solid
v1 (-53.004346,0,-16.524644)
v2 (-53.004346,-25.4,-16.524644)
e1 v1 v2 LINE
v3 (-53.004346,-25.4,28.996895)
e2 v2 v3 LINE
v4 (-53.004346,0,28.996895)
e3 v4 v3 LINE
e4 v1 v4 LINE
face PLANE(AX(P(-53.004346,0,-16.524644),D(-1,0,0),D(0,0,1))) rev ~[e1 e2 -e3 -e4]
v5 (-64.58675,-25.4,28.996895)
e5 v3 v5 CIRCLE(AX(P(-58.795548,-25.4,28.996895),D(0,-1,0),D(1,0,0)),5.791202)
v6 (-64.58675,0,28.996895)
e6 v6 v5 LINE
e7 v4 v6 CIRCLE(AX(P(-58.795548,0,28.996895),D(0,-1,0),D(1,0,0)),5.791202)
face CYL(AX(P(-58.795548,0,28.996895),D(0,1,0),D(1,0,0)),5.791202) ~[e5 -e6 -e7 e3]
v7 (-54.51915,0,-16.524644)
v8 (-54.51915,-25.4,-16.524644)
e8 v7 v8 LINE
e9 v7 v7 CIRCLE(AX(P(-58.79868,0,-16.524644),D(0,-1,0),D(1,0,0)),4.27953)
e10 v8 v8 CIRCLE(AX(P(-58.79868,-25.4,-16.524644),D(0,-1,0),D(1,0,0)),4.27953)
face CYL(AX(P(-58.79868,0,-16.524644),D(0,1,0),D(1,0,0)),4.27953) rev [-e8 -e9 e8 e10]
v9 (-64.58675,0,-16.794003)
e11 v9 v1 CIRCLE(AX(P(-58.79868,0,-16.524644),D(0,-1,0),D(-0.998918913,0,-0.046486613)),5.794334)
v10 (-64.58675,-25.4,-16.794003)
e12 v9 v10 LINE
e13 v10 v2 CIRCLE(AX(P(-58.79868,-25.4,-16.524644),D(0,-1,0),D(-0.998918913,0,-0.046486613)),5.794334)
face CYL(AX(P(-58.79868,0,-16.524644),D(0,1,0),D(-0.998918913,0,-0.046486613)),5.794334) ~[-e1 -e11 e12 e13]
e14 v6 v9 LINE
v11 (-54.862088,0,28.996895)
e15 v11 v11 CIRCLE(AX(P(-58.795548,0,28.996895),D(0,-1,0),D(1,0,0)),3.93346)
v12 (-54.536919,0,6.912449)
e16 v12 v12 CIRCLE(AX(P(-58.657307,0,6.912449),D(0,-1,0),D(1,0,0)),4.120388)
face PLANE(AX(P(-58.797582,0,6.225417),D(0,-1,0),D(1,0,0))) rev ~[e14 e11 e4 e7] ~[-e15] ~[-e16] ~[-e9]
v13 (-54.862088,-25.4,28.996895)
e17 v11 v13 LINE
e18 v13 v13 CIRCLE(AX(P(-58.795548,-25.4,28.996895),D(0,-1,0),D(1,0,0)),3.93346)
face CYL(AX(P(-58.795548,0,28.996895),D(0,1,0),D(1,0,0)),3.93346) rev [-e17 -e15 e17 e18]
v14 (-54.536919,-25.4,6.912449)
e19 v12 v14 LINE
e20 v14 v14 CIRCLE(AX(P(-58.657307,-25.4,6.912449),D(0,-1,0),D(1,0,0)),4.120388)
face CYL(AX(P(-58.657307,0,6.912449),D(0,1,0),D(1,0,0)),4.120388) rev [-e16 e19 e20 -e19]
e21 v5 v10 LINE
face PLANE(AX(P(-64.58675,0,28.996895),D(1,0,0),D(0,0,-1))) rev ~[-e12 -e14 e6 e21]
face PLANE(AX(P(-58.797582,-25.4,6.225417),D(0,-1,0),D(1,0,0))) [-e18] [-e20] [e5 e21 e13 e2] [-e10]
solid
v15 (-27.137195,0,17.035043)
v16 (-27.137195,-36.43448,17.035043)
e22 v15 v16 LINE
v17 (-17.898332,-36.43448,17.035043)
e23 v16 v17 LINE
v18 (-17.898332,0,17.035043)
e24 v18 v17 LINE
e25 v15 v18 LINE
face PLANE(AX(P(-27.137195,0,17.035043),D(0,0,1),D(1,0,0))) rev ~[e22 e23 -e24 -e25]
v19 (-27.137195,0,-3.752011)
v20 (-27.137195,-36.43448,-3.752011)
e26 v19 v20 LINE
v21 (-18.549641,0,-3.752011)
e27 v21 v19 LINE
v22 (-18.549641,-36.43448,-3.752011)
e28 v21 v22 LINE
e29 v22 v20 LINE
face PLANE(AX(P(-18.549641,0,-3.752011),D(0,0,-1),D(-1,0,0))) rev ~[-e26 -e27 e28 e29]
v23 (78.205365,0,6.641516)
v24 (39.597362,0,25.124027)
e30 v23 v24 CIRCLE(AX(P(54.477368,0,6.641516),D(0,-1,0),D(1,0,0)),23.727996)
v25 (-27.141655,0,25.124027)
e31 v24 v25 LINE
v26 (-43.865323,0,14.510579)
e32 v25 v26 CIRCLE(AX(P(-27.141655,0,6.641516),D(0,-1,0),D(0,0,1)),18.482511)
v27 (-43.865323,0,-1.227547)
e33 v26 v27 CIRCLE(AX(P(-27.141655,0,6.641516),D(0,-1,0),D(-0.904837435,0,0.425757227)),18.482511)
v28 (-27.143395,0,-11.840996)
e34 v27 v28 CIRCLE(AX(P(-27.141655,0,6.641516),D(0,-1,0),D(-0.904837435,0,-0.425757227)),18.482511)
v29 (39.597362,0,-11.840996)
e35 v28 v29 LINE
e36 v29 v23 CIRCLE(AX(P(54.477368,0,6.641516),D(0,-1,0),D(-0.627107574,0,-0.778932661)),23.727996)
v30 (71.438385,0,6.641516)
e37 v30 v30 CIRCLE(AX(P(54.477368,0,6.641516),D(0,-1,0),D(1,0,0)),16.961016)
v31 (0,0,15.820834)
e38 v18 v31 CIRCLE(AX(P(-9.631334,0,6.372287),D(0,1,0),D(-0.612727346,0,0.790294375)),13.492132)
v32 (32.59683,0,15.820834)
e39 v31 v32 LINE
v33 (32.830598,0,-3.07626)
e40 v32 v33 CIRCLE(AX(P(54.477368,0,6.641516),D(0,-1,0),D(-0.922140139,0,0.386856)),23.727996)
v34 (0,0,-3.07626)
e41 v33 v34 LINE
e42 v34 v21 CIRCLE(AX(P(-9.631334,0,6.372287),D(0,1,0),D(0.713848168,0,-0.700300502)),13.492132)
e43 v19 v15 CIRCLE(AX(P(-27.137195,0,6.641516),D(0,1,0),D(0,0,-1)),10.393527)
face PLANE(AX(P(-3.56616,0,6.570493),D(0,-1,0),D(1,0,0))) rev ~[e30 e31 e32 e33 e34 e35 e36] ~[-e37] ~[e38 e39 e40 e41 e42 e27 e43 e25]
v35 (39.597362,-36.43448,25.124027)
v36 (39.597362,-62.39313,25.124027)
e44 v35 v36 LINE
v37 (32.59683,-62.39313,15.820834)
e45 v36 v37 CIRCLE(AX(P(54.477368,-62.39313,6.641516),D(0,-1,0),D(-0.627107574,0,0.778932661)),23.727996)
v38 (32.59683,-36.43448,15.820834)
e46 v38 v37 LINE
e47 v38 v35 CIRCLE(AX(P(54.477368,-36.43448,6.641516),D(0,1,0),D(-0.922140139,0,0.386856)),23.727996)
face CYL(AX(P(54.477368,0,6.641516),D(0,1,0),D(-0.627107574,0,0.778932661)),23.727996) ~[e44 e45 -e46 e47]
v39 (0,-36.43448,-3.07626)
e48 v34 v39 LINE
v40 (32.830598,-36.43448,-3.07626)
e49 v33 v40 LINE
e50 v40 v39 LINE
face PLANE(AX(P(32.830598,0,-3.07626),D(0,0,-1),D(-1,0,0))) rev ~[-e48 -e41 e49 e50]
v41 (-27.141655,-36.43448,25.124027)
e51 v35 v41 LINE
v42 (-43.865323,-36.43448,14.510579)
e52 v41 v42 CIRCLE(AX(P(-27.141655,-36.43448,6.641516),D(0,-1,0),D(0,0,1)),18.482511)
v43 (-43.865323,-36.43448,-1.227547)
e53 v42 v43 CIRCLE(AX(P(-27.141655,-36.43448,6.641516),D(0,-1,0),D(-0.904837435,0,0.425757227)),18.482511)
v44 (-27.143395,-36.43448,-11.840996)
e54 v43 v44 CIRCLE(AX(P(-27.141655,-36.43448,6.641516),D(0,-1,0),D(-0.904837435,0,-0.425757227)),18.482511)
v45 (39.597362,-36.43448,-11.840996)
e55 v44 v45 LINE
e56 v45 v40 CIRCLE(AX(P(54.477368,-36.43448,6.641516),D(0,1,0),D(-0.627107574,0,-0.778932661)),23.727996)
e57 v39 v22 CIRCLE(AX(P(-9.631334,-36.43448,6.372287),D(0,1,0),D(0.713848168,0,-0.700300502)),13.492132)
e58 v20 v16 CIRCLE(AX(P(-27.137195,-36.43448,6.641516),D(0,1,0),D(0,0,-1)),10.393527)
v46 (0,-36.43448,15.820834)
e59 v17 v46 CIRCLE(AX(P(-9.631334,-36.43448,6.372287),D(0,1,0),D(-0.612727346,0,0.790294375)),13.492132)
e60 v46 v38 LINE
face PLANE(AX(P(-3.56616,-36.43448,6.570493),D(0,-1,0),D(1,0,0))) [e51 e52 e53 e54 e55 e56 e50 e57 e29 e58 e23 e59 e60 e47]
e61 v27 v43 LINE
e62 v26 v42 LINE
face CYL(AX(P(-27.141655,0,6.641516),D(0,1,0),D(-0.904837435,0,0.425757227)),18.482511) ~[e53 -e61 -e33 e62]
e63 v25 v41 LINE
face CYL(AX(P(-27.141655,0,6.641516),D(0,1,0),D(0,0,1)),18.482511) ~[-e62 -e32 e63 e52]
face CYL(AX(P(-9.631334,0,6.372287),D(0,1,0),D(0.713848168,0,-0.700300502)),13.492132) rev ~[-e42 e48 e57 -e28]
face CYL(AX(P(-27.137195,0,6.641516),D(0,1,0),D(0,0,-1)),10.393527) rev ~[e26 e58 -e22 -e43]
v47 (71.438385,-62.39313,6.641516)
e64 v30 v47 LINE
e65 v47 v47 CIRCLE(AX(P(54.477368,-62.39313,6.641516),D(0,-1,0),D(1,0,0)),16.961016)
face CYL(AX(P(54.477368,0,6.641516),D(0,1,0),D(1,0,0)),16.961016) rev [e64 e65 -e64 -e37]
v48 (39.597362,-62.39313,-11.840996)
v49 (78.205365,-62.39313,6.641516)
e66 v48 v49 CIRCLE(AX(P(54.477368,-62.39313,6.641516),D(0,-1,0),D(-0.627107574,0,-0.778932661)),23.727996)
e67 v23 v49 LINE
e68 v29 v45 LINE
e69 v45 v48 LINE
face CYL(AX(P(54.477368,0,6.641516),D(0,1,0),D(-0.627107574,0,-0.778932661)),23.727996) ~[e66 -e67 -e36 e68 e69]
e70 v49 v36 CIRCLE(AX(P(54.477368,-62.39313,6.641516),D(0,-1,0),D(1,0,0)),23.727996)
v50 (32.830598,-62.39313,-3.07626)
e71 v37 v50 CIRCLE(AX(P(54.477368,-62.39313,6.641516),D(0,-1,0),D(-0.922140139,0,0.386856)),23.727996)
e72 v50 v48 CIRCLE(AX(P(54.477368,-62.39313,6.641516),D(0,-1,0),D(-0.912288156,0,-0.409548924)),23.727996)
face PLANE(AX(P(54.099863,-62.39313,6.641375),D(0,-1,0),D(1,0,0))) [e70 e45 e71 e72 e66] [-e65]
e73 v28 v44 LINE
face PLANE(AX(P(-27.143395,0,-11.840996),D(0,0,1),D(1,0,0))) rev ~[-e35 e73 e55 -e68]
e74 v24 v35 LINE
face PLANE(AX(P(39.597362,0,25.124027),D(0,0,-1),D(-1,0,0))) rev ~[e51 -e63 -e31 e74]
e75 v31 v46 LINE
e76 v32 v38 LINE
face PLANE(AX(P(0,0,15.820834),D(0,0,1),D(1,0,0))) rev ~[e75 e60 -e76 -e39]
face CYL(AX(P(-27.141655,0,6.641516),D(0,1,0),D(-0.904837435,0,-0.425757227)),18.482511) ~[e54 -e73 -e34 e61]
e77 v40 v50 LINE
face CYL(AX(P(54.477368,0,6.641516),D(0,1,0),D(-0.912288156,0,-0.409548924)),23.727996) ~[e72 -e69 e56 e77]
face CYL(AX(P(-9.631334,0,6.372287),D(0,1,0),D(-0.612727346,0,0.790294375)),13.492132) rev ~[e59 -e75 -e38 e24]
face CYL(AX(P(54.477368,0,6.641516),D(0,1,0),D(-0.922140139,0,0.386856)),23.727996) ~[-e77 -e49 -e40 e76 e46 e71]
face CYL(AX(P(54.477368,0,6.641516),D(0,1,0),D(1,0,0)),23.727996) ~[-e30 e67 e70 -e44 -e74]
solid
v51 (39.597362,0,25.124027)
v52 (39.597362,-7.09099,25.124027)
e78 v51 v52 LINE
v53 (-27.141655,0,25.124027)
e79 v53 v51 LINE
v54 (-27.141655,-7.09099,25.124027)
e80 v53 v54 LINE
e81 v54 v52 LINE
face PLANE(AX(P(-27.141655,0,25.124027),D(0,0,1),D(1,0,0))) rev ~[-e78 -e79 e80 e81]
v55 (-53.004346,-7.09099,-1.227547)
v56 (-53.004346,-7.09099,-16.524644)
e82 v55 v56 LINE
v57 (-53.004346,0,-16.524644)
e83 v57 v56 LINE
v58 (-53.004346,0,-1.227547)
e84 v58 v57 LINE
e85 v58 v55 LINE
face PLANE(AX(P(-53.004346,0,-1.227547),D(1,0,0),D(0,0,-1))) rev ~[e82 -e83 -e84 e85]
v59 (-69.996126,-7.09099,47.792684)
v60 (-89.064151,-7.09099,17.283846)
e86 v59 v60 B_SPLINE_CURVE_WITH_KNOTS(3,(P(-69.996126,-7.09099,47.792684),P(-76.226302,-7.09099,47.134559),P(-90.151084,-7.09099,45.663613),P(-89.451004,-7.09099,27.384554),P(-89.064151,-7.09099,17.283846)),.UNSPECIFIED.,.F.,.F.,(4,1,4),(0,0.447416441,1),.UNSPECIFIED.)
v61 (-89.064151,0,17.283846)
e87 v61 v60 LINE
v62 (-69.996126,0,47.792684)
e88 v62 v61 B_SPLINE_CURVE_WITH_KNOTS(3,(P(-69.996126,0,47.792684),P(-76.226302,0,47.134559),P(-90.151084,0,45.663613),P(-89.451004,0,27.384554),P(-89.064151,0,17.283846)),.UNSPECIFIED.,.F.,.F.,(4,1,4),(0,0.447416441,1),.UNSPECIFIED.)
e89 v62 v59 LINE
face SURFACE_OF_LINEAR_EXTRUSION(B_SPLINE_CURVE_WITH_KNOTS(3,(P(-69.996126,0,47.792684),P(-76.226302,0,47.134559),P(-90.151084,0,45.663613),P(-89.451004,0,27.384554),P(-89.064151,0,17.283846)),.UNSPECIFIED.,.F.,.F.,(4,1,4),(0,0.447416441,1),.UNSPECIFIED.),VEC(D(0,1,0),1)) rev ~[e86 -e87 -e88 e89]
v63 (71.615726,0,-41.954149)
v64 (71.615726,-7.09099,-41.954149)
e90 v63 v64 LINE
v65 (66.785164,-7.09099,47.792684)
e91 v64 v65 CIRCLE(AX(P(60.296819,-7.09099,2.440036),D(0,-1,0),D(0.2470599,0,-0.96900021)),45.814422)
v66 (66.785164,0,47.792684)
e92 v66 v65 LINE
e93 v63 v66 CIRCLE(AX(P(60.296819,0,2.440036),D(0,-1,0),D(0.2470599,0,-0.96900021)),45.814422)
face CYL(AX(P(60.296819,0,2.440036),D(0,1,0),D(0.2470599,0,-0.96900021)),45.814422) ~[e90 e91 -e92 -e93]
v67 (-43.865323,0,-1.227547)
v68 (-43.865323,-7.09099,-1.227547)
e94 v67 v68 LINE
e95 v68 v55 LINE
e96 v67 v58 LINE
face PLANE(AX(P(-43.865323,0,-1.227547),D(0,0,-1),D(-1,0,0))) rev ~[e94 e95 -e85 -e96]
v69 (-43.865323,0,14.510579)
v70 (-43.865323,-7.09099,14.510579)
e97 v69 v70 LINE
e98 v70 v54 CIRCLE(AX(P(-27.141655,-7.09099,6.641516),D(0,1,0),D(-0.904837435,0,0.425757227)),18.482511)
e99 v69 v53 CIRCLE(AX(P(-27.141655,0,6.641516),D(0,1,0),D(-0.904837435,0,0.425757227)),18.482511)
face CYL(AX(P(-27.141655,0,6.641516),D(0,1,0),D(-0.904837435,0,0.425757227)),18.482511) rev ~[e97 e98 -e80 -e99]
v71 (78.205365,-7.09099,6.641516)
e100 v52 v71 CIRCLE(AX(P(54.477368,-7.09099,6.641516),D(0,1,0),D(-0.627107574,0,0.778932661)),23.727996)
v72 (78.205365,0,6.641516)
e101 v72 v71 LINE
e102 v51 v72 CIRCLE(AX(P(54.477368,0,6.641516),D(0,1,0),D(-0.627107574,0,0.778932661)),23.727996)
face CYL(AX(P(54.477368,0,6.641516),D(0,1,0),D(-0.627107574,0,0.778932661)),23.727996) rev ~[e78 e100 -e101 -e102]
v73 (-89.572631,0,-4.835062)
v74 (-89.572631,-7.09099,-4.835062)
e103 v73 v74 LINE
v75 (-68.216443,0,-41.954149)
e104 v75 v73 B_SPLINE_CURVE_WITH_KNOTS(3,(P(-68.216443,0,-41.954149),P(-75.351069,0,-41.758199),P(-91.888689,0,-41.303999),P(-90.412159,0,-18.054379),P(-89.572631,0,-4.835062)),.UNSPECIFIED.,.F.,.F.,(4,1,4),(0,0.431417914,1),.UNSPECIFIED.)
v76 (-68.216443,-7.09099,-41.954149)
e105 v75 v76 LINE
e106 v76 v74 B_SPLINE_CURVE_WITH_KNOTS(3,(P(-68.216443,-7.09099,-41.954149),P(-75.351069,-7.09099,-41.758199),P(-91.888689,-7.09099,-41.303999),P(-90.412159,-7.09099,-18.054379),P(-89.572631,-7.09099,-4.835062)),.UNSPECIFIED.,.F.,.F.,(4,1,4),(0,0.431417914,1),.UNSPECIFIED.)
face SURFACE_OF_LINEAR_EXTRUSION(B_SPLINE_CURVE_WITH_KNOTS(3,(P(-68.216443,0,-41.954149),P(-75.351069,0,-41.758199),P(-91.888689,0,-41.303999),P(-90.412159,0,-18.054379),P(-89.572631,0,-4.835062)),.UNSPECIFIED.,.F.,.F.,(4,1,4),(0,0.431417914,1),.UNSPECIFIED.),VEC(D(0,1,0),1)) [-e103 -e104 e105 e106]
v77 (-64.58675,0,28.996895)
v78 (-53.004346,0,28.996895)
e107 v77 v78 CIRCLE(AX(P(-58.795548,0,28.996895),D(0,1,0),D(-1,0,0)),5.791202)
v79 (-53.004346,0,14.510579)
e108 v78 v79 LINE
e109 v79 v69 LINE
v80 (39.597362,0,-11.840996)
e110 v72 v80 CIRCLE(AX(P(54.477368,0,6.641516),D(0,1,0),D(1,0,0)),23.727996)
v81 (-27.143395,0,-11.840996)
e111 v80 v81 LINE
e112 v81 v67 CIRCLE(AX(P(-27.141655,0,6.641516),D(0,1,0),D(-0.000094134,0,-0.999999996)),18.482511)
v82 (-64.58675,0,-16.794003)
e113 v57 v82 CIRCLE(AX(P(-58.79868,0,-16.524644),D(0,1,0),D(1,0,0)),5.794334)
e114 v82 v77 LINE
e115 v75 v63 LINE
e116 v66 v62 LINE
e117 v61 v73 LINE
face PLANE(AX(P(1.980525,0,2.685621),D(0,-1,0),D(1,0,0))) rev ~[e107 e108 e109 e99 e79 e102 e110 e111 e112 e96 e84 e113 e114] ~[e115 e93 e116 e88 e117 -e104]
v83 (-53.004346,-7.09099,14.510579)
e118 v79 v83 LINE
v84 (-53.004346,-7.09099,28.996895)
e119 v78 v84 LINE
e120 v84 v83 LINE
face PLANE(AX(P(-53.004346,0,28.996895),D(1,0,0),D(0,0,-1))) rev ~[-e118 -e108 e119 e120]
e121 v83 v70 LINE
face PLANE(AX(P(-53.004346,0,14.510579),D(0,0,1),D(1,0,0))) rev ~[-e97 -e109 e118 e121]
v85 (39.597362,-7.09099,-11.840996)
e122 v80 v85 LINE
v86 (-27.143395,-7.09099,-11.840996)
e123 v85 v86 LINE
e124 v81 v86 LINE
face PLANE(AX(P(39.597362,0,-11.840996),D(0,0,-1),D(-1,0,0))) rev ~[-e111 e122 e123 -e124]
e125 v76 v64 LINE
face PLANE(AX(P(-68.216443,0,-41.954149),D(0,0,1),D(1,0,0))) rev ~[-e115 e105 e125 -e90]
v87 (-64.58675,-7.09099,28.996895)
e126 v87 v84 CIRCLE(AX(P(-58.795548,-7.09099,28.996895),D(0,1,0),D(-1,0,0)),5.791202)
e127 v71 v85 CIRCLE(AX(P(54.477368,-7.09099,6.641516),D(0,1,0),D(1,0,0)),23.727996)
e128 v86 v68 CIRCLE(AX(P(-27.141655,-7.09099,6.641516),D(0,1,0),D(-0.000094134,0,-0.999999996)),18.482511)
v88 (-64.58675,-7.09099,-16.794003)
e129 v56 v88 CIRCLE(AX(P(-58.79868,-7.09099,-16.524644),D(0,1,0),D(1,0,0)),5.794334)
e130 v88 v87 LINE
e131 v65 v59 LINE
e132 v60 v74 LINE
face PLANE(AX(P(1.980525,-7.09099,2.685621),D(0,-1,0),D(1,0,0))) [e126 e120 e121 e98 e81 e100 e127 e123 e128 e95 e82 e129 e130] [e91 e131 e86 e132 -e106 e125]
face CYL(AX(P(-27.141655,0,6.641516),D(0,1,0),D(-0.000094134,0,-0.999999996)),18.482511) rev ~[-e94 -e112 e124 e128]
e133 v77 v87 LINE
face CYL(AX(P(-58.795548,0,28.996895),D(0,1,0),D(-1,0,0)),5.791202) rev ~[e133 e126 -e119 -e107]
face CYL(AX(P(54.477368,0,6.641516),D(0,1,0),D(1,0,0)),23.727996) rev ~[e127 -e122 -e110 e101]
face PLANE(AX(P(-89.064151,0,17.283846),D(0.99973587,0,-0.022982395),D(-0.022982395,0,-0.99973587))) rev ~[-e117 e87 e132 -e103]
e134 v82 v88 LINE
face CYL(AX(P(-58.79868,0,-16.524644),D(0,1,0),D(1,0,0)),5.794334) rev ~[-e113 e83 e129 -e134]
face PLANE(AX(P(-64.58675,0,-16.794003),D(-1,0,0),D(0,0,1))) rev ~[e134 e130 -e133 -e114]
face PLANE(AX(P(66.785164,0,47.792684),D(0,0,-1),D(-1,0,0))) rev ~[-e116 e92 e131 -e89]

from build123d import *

# Parameters (mm, degrees)
F0_R     = 4.2795303883
F0_R_2   = 4.1203882692
F0_R_3   = 3.9334600098
F1_DEPTH = 25.4
F0_R_4   = 16.9610161395
F2_DEPTH = 62.39313
F3_DEPTH = 36.43448
F6_DEPTH = 7.09099


# Not quite as in the source:
# - the program builds the solid bodies; features that only make, move or delete a surface that nothing else refers to are left out


with BuildPart() as f1:
    # F0 (on Front) → F1 (new body)
    with BuildSketch(Plane.XZ):
        with BuildLine():
            ThreePointArc((-53.0043460473, 28.996894532), (-58.7955482348, 34.7880967196), (-64.5867504224, 28.996894532))
            Line((-64.5867504224, 28.996894532), (-64.5867504224, -16.7940031503))
            ThreePointArc((-64.5867504224, -16.7940031503), (-58.6639644209, -22.3174121933), (-53.0043460473, -16.5246441726))
            Line((-53.0043460473, -16.5246441726), (-53.0043460473, -1.2275470406))
            Line((-53.0043460473, -1.2275470406), (-53.0043460473, 14.5105786386))
            Line((-53.0043460473, 14.5105786386), (-53.0043460473, 28.996894532))
        make_face()
        with Locations((-58.7986803245, -16.5246441726)):
            Circle(F0_R, mode=Mode.SUBTRACT)
        with Locations((-58.6573071778, 6.9124489091)):
            Circle(F0_R_2, mode=Mode.SUBTRACT)
        with Locations((-58.7955482348, 28.996894532)):
            Circle(F0_R_3, mode=Mode.SUBTRACT)
    extrude(amount=F1_DEPTH)


with BuildPart() as f2:
    # F0 (on Front) → F2 (new body)
    with BuildSketch(Plane.XZ):
        with BuildLine():
            ThreePointArc((78.2053648656, 6.6415158399), (64.7229791348, 28.0435082172), (39.5973620512, 25.1240272913))
            ThreePointArc((39.5973620512, 25.1240272913), (35.5176279372, 20.9084727793), (32.5968303911, 15.8208336432))
            ThreePointArc((32.5968303911, 15.8208336432), (30.7511872282, 6.348009445), (32.8305982139, -3.0762595944))
            ThreePointArc((32.8305982139, -3.0762595944), (35.6955553778, -7.8588744416), (39.5973620512, -11.8409956114))
            ThreePointArc((39.5973620512, -11.8409956114), (64.7229791348, -14.7604765374), (78.2053648656, 6.6415158399))
        make_face()
        with Locations((54.4773683713, 6.6415158399)):
            Circle(F0_R_4, mode=Mode.SUBTRACT)
    extrude(amount=F2_DEPTH)

    # F0 (on Front) → F3 (join)
    with BuildSketch(Plane.XZ):
        with BuildLine():
            ThreePointArc((-27.1416550456, 25.1240272913), (-37.0452702112, 22.246695635), (-43.8653233361, 14.5105786386))
            ThreePointArc((-43.8653233361, 14.5105786386), (-45.6241665379, 6.641515799), (-43.8653233361, -1.2275470406))
            ThreePointArc((-43.8653233361, -1.2275470406), (-37.0460046869, -8.9631978878), (-27.1433948729, -11.8409956114))
            Line((-27.1433948729, -11.8409956114), (39.5973620512, -11.8409956114))
            ThreePointArc((39.5973620512, -11.8409956114), (35.6955553778, -7.8588744416), (32.8305982139, -3.0762595944))
            Line((32.8305982139, -3.0762595944), (0, -3.0762595944))
            ThreePointArc((0, -3.0762595944), (-9.1401495961, -7.1109009087), (-18.5496408035, -3.752011153))
            Line((-18.5496408035, -3.752011153), (-27.1371953138, -3.752011153))
            ThreePointArc((-27.1371953138, -3.752011153), (-37.5307223067, 6.6415158399), (-27.1371953138, 17.0350428328))
            Line((-27.1371953138, 17.0350428328), (-17.8983315824, 17.0350428328))
            ThreePointArc((-17.8983315824, 17.0350428328), (-8.7181364976, 19.8334790106), (0, 15.8208336432))
            Line((0, 15.8208336432), (32.5968303911, 15.8208336432))
            ThreePointArc((32.5968303911, 15.8208336432), (35.5176279372, 20.9084727793), (39.5973620512, 25.1240272913))
            Line((39.5973620512, 25.1240272913), (-27.1416550456, 25.1240272913))
        make_face()
    extrude(amount=F3_DEPTH)


with BuildPart() as f6:
    # F0 (on Front) → F6 (new body)
    with BuildSketch(Plane.XZ):
        with BuildLine():
            Line((-68.2164430618, -41.9541485608), (71.6157257557, -41.9541485608))
            ThreePointArc((71.6157257557, -41.9541485608), (106.0450219063, 4.9024018867), (66.7851641774, 47.7926842868))
            Line((66.7851641774, 47.7926842868), (-69.9961259961, 47.7926842868))
            add(Edge.make_bspline(
                [(-69.9961259961, 47.7926842868), (-76.2263024319, 47.1345590327), (-90.1510844896, 45.6636134143), (-89.4510040109, 27.3845536081), (-89.0641510487, 17.2838456929)],
                knots=[0, 0, 0, 0, 0.4474164414, 1, 1, 1, 1], degree=3))
            Line((-89.0641510487, 17.2838456929), (-89.5726308227, -4.835061729))
            add(Edge.make_bspline(
                [(-68.2164430618, -41.9541485608), (-75.3510688203, -41.7581987898), (-91.8886893642, -41.3039993589), (-90.4121593424, -18.0543792359), (-89.5726308227, -4.835061729)],
                knots=[0, 0, 0, 0, 0.4314179141, 1, 1, 1, 1], degree=3))
        make_face()
        with BuildLine():
            Line((-64.5867504224, -16.7940031503), (-64.5867504224, 28.996894532))
            ThreePointArc((-64.5867504224, 28.996894532), (-58.7955482348, 34.7880967196), (-53.0043460473, 28.996894532))
            Line((-53.0043460473, 28.996894532), (-53.0043460473, 14.5105786386))
            Line((-53.0043460473, 14.5105786386), (-43.8653233361, 14.5105786386))
            ThreePointArc((-43.8653233361, 14.5105786386), (-37.0452702112, 22.246695635), (-27.1416550456, 25.1240272913))
            Line((-27.1416550456, 25.1240272913), (39.5973620512, 25.1240272913))
            ThreePointArc((39.5973620512, 25.1240272913), (64.7229791348, 28.0435082172), (78.2053648656, 6.6415158399))
            ThreePointArc((78.2053648656, 6.6415158399), (64.7229791348, -14.7604765374), (39.5973620512, -11.8409956114))
            Line((39.5973620512, -11.8409956114), (-27.1433948729, -11.8409956114))
            ThreePointArc((-27.1433948729, -11.8409956114), (-37.0460046869, -8.9631978878), (-43.8653233361, -1.2275470406))
            Line((-43.8653233361, -1.2275470406), (-53.0043460473, -1.2275470406))
            Line((-53.0043460473, -1.2275470406), (-53.0043460473, -16.5246441726))
            ThreePointArc((-53.0043460473, -16.5246441726), (-58.6639644209, -22.3174121933), (-64.5867504224, -16.7940031503))
        make_face(mode=Mode.SUBTRACT)
    extrude(amount=F6_DEPTH)


solid = Compound([f1.part, f2.part, f6.part])
